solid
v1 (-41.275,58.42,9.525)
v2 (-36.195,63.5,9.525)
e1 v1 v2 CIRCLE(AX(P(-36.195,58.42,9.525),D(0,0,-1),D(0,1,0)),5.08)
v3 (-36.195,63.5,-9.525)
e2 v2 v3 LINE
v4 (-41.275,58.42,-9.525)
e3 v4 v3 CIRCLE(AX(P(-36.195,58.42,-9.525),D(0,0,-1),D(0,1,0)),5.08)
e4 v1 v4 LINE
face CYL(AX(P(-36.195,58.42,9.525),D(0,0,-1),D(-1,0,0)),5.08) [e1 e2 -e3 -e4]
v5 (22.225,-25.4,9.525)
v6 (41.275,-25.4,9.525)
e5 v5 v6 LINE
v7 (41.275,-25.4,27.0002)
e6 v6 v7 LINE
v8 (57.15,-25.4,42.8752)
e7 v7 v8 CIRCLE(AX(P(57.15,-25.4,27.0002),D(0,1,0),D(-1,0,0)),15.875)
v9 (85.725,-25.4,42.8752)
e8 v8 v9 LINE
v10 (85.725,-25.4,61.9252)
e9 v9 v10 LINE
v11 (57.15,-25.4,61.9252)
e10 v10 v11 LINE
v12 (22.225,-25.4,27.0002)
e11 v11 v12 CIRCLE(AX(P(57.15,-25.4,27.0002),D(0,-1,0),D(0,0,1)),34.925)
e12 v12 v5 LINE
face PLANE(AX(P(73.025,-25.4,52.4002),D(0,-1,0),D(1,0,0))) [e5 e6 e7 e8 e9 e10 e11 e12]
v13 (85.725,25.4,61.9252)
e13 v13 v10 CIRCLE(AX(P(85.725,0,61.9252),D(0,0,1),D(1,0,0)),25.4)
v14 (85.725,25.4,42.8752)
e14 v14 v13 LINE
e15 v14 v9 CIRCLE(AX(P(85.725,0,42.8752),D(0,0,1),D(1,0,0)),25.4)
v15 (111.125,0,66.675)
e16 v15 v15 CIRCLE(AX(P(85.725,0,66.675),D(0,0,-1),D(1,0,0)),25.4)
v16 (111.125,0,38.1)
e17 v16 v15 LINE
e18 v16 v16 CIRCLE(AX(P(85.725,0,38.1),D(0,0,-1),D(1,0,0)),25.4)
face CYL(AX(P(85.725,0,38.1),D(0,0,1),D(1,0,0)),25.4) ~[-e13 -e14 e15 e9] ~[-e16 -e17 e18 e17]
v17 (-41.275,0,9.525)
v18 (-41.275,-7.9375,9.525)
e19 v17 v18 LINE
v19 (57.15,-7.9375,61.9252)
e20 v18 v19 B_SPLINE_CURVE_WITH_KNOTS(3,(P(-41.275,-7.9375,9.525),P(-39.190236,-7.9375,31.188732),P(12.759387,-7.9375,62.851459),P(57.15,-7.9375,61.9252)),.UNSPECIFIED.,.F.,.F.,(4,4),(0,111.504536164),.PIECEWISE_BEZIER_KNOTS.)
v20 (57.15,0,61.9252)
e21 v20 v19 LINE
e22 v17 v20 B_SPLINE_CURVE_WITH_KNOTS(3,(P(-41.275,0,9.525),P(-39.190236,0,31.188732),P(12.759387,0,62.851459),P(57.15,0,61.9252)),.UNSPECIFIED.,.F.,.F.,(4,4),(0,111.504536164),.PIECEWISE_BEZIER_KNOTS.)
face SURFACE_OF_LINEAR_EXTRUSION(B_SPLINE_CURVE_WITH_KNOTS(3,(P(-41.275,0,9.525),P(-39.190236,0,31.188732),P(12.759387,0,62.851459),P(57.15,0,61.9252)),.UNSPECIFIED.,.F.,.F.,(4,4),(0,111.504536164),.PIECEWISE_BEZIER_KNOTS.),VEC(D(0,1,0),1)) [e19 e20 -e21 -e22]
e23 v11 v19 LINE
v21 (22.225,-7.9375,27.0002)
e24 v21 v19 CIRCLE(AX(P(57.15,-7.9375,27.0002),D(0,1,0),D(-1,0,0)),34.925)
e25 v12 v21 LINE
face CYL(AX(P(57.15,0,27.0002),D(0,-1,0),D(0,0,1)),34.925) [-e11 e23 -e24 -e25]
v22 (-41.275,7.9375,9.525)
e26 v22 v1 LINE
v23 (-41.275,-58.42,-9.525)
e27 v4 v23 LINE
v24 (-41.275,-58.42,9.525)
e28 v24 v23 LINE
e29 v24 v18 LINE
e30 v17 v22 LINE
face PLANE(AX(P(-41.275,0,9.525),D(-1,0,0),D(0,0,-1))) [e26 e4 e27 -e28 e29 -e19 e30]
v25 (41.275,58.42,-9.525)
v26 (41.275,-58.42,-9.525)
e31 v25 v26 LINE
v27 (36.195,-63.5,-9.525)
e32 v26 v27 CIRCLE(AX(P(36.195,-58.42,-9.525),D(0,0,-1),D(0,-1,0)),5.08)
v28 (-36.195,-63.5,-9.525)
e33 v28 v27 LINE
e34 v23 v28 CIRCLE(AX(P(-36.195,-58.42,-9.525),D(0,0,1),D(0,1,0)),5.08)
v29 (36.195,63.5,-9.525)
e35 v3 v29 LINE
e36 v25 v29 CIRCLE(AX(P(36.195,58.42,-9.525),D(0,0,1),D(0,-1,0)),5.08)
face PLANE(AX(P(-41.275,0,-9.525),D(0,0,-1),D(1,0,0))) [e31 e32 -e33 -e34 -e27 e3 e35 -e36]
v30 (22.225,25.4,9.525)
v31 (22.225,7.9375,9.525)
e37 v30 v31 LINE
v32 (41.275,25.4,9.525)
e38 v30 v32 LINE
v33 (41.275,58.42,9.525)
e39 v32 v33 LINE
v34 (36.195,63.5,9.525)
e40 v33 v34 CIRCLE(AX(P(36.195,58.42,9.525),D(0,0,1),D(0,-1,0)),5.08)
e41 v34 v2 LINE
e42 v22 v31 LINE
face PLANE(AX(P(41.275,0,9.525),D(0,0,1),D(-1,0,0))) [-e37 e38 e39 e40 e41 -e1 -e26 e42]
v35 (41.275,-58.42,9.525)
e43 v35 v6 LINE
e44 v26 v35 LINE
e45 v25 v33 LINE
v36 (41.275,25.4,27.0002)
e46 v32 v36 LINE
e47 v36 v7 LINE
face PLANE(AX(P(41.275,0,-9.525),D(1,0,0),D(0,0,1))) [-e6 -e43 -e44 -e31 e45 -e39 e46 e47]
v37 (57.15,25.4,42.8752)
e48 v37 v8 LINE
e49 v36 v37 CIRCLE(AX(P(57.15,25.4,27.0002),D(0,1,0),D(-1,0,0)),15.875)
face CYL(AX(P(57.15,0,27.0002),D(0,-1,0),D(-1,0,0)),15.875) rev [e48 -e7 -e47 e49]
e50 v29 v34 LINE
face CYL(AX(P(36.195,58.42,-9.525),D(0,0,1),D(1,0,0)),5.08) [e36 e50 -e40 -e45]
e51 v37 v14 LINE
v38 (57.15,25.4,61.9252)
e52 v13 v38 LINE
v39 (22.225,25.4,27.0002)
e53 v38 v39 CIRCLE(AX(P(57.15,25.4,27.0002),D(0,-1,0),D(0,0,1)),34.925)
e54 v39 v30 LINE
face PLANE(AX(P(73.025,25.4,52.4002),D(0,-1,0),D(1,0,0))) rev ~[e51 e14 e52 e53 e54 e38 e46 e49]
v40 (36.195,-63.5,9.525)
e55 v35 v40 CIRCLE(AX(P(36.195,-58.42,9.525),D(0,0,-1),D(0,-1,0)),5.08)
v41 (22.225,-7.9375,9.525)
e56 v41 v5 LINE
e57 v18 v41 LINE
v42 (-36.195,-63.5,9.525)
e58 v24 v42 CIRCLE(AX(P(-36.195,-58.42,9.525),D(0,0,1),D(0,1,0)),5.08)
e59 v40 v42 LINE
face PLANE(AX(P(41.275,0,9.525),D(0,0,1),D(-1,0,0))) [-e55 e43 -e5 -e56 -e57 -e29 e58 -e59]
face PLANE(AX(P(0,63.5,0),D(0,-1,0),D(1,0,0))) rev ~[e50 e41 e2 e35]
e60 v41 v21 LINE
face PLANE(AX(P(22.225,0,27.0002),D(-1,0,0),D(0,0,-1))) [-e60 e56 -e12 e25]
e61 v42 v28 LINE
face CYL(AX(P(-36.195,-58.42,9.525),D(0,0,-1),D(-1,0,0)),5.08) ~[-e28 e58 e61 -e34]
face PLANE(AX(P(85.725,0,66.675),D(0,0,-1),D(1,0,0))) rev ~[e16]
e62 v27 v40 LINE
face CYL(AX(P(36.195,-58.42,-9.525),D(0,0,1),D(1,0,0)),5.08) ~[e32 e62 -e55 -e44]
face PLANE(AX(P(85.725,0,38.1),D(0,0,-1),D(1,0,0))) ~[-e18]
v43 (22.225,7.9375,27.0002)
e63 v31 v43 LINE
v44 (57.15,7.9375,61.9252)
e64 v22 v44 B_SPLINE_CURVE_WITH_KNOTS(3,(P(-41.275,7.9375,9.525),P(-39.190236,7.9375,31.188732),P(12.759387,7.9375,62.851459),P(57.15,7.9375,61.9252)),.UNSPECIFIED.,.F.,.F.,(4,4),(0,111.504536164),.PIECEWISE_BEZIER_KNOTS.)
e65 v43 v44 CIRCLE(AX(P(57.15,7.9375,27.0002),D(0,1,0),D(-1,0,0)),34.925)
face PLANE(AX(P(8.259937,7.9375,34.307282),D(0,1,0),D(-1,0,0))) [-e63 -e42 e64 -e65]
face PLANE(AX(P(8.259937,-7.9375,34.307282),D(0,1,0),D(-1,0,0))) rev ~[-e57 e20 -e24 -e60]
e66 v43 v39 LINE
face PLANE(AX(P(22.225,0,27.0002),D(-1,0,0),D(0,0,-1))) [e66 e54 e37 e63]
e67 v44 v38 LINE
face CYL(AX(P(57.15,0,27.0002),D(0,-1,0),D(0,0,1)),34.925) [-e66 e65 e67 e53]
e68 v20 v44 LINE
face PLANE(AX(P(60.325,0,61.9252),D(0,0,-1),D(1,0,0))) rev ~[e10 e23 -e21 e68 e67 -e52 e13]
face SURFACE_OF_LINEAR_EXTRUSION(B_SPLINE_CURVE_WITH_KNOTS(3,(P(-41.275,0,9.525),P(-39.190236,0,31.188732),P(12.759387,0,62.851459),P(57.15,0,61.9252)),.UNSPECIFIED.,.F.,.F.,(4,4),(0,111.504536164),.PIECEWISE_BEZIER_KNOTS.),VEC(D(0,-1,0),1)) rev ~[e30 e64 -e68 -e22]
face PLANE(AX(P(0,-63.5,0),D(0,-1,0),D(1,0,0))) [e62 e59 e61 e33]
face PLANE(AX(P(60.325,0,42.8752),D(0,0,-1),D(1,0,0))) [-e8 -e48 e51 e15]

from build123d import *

# Parameters (mm, degrees)
F1_DEPTH = 63.5
F2_DEPTH = 25.4
F3_DEPTH = 7.9375
F0_W     = 25.4
F0_H     = 19.05
F4_DEPTH = 25.4
F6_R     = 5.08


# Not quite as in the source:
# - a feature names something its author has since deleted; it is built from what else it names


with BuildPart() as f1:
    # F0 (on Front) → F1 (new body, symmetric)
    with BuildSketch(Plane.XZ):
        Polygon((22.225, 9.525), (-41.275, 9.525), (-41.275, -9.525), (41.275, -9.525), (41.275, 9.525), align=None)
    extrude(amount=F1_DEPTH, both=True)

    # F0 (on Front) → F2 (join, symmetric)
    with BuildSketch(Plane.XZ):
        with BuildLine():
            Line((22.225, 27.0002), (22.225, 9.525))
            Line((22.225, 9.525), (41.275, 9.525))
            Line((41.275, 9.525), (41.275, 27.0002))
            ThreePointArc((41.275, 27.0002), (45.9246798487, 38.2255201513), (57.15, 42.8752))
            Line((57.15, 42.8752), (60.325, 42.8752))
            Line((60.325, 42.8752), (60.325, 61.9252))
            Line((60.325, 61.9252), (57.15, 61.9252))
            ThreePointArc((57.15, 61.9252), (32.4542956671, 51.6959043329), (22.225, 27.0002))
        make_face()
    extrude(amount=F2_DEPTH, both=True)

    # F0 (on Front) → F3 (join, symmetric)
    with BuildSketch(Plane.XZ):
        with BuildLine():
            add(Edge.make_bspline(
                [(-41.275, 9.525), (-39.190236479, 31.1887320131), (12.7593874931, 62.8514587879), (57.15, 61.9252)],
                knots=[0, 0, 0, 0, 111.5045361635, 111.5045361635, 111.5045361635, 111.5045361635], degree=3))
            Line((-41.275, 9.525), (22.225, 9.525))
            Line((22.225, 9.525), (22.225, 27.0002))
            ThreePointArc((22.225, 27.0002), (32.4542956671, 51.6959043329), (57.15, 61.9252))
        make_face()
    extrude(amount=F3_DEPTH, both=True)

    # F0 (on Front) → F4 (join, symmetric)
    with BuildSketch(Plane.XZ):
        with Locations((73.025, 52.4002)):
            Rectangle(F0_W, F0_H)
    extrude(amount=F4_DEPTH, both=True)

    # F0 (on Front) → F5 (revolve)
    with BuildSketch(Plane.XZ):
        Polygon((85.725, 66.675), (85.725, 61.9252), (85.725, 42.8752), (85.725, 38.1), (111.125, 38.1), (111.125, 66.675), align=None)
    revolve(axis=Axis((85.725, 0, 52.3875), (0, 0, -1)))

    # F6
    f6_edges = [f1.edges().sort_by_distance(p)[0] for p in [
        (41.275, -63.5, 0),
        (-41.275, -63.5, 0),
        (-41.275, 63.5, 0),
        (41.275, 63.5, 0),
    ]]
    fillet(f6_edges, radius=F6_R)


solid = f1.part
